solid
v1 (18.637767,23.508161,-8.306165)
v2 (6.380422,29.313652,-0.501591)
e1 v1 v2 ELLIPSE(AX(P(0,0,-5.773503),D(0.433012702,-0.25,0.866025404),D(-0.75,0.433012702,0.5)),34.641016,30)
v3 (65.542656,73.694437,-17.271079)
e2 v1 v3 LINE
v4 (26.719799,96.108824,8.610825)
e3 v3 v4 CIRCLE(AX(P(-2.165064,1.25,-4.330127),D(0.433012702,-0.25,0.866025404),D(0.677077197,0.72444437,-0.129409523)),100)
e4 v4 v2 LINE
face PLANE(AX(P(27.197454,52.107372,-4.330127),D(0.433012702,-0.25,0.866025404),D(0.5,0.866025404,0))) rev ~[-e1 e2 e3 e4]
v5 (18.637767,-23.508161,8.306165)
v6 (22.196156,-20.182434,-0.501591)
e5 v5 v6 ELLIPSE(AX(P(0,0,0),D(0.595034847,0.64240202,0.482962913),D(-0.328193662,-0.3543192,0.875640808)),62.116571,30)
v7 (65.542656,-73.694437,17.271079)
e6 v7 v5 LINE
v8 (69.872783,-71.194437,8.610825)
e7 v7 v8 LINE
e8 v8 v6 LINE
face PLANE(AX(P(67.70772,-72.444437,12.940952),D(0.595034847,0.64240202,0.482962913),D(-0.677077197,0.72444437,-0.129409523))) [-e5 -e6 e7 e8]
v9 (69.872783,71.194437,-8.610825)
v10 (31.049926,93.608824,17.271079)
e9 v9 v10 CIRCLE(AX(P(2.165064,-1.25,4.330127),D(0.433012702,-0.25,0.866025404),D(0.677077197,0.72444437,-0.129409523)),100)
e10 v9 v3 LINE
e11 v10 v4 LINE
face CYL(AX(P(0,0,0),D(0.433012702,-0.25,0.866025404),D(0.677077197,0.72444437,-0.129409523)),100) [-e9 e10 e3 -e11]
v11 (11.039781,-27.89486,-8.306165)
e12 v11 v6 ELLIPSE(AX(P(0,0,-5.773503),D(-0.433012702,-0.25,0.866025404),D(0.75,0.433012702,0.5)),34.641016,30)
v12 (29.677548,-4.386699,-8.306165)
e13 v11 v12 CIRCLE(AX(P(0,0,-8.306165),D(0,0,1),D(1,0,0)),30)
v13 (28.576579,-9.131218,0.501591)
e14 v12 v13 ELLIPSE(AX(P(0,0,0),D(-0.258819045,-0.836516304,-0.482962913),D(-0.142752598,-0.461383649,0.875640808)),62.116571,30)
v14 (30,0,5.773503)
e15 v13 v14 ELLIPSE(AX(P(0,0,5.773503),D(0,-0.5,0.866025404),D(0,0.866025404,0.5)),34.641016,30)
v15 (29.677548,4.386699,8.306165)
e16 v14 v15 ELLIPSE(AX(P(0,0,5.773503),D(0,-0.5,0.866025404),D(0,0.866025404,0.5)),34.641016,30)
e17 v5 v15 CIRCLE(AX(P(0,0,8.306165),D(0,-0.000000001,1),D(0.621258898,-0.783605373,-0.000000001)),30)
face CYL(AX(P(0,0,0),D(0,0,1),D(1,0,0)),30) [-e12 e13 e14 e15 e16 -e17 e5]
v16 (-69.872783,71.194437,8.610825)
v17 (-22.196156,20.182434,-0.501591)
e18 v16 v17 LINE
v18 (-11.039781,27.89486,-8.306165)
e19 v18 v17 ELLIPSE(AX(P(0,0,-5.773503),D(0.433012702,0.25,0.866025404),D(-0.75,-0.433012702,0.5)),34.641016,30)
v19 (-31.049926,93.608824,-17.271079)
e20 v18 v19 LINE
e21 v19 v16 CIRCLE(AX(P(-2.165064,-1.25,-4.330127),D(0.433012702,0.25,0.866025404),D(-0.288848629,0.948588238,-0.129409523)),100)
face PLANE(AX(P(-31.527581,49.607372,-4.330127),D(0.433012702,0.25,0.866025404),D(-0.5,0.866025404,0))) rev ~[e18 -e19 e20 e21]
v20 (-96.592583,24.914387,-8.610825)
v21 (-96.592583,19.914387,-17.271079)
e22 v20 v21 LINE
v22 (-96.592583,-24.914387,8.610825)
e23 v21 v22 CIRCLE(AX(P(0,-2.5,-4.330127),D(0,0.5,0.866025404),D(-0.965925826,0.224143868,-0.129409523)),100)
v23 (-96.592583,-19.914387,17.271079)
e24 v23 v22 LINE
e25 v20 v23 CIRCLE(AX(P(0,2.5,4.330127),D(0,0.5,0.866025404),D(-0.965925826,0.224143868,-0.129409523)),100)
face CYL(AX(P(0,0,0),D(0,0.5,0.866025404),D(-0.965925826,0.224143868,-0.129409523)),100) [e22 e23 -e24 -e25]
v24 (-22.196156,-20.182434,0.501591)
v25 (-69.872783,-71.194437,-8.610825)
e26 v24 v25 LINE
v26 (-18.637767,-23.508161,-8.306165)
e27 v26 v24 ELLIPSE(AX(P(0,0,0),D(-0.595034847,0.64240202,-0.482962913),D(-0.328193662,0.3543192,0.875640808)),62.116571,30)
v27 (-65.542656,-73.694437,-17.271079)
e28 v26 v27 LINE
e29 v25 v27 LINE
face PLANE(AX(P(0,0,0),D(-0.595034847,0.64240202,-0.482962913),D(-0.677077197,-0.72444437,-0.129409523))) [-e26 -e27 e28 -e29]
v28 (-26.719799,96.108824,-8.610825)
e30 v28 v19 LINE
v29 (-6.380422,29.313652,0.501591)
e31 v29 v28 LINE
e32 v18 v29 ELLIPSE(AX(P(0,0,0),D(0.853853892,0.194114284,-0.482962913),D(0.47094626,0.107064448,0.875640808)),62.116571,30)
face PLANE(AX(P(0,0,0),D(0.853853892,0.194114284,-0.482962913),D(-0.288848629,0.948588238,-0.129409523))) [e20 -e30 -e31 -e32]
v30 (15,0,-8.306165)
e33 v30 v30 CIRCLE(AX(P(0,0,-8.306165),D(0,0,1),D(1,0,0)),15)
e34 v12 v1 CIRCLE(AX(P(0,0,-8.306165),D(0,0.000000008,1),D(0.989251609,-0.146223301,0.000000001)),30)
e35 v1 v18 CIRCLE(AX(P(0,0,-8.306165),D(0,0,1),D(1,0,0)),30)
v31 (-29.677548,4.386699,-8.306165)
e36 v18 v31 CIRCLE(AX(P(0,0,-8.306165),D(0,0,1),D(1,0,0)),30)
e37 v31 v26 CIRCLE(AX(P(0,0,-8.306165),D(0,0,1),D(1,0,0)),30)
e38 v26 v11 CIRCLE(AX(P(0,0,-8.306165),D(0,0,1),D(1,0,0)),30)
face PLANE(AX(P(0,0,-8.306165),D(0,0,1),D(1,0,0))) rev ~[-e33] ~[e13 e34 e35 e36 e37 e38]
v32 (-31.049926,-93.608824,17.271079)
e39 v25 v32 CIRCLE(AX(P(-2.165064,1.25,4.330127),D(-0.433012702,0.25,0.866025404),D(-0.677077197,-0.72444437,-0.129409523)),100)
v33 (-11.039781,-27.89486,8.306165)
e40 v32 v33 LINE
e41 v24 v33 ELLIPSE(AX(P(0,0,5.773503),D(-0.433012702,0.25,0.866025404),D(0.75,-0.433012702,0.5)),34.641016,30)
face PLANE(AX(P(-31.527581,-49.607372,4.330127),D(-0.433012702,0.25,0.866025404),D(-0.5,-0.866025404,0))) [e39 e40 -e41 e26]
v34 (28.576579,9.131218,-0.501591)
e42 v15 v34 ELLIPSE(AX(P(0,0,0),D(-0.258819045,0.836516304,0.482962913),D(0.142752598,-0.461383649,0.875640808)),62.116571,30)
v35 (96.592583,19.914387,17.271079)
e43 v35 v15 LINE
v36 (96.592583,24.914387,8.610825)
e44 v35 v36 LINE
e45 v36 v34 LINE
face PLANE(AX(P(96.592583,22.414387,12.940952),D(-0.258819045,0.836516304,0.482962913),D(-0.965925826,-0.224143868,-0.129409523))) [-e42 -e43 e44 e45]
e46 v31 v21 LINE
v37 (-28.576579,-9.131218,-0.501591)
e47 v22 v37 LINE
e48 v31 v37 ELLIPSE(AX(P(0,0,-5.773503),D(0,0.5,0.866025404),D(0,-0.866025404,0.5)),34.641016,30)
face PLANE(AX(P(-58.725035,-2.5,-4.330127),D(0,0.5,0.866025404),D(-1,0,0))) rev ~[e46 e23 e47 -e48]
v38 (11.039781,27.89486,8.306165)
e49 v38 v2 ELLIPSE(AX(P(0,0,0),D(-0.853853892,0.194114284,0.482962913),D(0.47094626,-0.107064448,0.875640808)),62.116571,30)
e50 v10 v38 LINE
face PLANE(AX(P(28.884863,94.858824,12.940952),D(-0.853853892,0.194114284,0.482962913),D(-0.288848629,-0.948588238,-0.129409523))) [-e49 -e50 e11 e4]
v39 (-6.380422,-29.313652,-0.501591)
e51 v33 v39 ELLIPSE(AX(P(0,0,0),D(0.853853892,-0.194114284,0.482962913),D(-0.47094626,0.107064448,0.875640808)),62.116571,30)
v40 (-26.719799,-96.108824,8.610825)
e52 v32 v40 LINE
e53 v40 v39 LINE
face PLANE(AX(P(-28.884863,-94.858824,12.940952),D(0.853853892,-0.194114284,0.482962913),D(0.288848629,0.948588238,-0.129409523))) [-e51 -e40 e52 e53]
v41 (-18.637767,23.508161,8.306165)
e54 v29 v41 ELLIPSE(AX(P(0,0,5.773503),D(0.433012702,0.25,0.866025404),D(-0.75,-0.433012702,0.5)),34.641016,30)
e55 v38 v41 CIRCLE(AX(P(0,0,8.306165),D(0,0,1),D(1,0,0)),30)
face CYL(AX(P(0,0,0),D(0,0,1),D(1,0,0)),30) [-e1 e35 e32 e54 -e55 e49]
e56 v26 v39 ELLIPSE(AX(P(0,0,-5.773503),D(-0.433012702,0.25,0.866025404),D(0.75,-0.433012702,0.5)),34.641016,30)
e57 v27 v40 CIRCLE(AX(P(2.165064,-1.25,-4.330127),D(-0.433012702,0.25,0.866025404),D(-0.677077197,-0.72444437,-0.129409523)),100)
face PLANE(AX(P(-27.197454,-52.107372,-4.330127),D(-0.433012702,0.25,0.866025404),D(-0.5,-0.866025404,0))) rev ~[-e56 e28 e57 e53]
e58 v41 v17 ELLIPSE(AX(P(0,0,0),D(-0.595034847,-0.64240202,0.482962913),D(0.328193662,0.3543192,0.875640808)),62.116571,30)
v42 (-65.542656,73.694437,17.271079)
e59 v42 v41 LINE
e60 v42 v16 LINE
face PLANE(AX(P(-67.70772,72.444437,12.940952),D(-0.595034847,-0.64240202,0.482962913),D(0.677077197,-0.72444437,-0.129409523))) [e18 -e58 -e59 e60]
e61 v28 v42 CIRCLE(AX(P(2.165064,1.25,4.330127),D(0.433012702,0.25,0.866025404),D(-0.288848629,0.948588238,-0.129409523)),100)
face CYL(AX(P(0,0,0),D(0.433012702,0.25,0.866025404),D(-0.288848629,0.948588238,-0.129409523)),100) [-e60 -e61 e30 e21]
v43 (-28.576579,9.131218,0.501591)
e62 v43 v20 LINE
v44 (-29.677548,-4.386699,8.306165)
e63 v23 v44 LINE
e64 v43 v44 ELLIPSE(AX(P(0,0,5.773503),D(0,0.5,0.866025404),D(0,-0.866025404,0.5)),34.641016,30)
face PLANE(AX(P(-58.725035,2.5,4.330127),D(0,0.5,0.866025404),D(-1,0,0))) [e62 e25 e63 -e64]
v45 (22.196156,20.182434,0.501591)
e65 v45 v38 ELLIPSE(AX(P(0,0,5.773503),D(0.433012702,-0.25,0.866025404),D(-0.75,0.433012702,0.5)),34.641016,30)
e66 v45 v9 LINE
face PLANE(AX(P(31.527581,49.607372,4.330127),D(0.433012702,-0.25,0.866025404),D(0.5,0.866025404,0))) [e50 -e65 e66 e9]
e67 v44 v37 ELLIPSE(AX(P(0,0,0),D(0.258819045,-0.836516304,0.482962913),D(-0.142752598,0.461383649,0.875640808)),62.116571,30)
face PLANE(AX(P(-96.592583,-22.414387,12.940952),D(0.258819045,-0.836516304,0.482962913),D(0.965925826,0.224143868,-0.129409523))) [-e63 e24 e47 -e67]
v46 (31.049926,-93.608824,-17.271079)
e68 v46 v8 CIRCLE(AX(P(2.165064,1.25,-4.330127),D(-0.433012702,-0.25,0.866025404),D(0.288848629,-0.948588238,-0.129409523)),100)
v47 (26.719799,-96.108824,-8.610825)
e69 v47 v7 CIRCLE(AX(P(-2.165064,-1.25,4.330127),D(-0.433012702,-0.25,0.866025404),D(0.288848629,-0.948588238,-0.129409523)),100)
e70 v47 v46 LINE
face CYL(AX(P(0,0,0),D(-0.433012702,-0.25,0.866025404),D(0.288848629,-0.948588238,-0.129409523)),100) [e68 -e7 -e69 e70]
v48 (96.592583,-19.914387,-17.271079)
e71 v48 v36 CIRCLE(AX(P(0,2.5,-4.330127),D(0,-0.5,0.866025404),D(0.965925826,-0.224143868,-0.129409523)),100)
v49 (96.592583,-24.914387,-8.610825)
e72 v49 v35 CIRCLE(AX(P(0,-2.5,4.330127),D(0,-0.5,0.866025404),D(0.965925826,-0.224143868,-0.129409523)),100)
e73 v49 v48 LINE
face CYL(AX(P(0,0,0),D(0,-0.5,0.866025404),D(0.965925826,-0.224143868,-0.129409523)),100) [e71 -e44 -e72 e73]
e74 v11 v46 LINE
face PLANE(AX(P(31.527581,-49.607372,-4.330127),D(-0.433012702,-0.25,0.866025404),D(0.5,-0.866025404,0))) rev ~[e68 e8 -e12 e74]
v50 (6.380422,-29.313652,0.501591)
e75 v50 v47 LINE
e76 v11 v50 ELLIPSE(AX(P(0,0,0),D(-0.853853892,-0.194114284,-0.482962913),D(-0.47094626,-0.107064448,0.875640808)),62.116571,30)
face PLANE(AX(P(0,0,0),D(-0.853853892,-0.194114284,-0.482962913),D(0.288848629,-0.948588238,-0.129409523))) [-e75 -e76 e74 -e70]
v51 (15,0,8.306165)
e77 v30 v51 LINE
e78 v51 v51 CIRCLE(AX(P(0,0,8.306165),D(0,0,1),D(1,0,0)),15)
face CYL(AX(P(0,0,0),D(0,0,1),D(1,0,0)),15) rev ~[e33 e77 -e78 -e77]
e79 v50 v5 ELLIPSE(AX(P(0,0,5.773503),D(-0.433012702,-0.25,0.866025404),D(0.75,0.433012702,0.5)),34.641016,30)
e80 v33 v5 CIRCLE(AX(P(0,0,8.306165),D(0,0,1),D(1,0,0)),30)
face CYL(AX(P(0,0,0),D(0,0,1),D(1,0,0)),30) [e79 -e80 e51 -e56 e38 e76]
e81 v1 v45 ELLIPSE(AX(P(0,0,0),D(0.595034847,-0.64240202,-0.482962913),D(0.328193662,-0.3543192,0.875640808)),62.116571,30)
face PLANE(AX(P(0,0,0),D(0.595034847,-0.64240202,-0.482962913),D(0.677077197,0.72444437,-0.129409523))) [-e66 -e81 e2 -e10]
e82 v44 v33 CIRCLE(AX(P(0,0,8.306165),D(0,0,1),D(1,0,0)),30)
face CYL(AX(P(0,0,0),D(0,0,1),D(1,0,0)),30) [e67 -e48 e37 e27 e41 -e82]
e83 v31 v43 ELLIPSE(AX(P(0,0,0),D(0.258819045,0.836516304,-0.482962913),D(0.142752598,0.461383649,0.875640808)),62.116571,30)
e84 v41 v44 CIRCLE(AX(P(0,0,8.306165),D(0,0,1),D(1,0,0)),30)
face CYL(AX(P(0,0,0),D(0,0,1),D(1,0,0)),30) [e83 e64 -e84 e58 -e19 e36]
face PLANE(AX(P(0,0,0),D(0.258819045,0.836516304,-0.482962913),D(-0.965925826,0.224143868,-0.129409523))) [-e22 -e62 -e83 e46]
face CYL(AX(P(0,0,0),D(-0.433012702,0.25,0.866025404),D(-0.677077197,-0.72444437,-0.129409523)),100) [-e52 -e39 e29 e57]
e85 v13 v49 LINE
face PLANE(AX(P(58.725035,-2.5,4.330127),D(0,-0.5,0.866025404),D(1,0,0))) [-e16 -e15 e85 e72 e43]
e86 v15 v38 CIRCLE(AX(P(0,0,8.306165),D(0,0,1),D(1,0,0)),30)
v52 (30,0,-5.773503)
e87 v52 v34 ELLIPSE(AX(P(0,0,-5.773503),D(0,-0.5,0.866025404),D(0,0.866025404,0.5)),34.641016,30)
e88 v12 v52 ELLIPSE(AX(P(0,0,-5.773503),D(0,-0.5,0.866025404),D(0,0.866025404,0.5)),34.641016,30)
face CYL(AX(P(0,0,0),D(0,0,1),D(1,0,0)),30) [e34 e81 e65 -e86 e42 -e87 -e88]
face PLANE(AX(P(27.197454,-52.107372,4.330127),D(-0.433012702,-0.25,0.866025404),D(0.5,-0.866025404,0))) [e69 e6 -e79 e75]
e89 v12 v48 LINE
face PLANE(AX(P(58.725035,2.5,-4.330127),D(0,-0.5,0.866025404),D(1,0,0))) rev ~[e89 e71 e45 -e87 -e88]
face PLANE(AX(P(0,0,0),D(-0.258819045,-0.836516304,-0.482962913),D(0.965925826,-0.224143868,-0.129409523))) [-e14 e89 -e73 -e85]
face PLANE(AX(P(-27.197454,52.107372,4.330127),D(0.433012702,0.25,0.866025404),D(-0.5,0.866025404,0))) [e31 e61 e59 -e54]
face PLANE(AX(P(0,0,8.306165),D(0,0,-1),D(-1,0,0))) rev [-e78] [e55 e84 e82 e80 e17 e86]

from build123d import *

# Parameters (mm, degrees)
F1_DEPTH  = 5
F2_ANGLE  = 30
F4_COUNT  = 6
F5_R      = 30
F6_DEPTH  = 12.5
F11_DEPTH = 4.1938354
F12_R     = 15
F13_DEPTH = 12.5


# Not quite as in the source:
# - an extrude ends at something that could not be found from the text; its depth is read off the source's solid
# - a feature of the source that left no trace in its solid (it failed there, or was rolled back) is left out
# - a pattern or mirror of a feature is missing from the dataset's text; its kind, count and spacing are read off the source's solid


with BuildPart() as f1:
    # F0 (on Top) → F1 (new body, symmetric)
    with BuildSketch(Plane.XY):
        with BuildLine():
            Line((96.5925826289, 25.8819045103), (0, 0))
            Line((0, 0), (96.5925826289, -25.8819045103))
            ThreePointArc((96.5925826289, -25.8819045103), (100, 0), (96.5925826289, 25.8819045103))
        make_face()
    extrude(amount=F1_DEPTH, both=True)


with BuildPart() as f1_1:
    # F2: moved
    add(f1.part.rotate(Axis((70.1462253928, 0, 0), (1, 0, 0)), F2_ANGLE))


with BuildPart() as f4_1:
    # F4: instance of F1
    add(f1_1.part.rotate(Axis((0, 0, 33.6874611676), (0, 0, 1)), 1 * 360 / F4_COUNT))


with BuildPart() as f4_2:
    # F4: instance of F1
    add(f1_1.part.rotate(Axis((0, 0, 33.6874611676), (0, 0, 1)), 2 * 360 / F4_COUNT))


with BuildPart() as f4_3:
    # F4: instance of F1
    add(f1_1.part.rotate(Axis((0, 0, 33.6874611676), (0, 0, 1)), 3 * 360 / F4_COUNT))


with BuildPart() as f4_4:
    # F4: instance of F1
    add(f1_1.part.rotate(Axis((0, 0, 33.6874611676), (0, 0, 1)), 4 * 360 / F4_COUNT))


with BuildPart() as f4_5:
    # F4: instance of F1
    add(f1_1.part.rotate(Axis((0, 0, 33.6874611676), (0, 0, 1)), 5 * 360 / F4_COUNT))


with BuildPart() as f1_2:
    add(f1_1.part)

    add(f4_1.part)  # F6 merges F4_1

    add(f4_2.part)  # F6 merges F4_2

    add(f4_3.part)  # F6 merges F4_3

    add(f4_4.part)  # F6 merges F4_4

    add(f4_5.part)  # F6 merges F4_5
    # F5 (on Top) → F6 (join, symmetric)
    with BuildSketch(Plane.XY):
        Circle(F5_R)
    extrude(amount=F6_DEPTH, both=True)

    # F11 (cut, through all): a face of the model
    f11_faces = [f1_2.faces().sort_by_distance(p)[0] for p in [
        (0, 0, -12.5),
    ]]
    f11 = extrude(f11_faces, amount=-F11_DEPTH, mode=Mode.SUBTRACT)

    # F11_copies: F11 across plane
    add(f11.mirror(Plane.XY), mode=Mode.SUBTRACT)

    # F12 (on Top) → F13 (cut, symmetric)
    with BuildSketch(Plane.XY):
        Circle(F12_R)
    extrude(amount=F13_DEPTH, both=True, mode=Mode.SUBTRACT)


solid = f1_2.part
